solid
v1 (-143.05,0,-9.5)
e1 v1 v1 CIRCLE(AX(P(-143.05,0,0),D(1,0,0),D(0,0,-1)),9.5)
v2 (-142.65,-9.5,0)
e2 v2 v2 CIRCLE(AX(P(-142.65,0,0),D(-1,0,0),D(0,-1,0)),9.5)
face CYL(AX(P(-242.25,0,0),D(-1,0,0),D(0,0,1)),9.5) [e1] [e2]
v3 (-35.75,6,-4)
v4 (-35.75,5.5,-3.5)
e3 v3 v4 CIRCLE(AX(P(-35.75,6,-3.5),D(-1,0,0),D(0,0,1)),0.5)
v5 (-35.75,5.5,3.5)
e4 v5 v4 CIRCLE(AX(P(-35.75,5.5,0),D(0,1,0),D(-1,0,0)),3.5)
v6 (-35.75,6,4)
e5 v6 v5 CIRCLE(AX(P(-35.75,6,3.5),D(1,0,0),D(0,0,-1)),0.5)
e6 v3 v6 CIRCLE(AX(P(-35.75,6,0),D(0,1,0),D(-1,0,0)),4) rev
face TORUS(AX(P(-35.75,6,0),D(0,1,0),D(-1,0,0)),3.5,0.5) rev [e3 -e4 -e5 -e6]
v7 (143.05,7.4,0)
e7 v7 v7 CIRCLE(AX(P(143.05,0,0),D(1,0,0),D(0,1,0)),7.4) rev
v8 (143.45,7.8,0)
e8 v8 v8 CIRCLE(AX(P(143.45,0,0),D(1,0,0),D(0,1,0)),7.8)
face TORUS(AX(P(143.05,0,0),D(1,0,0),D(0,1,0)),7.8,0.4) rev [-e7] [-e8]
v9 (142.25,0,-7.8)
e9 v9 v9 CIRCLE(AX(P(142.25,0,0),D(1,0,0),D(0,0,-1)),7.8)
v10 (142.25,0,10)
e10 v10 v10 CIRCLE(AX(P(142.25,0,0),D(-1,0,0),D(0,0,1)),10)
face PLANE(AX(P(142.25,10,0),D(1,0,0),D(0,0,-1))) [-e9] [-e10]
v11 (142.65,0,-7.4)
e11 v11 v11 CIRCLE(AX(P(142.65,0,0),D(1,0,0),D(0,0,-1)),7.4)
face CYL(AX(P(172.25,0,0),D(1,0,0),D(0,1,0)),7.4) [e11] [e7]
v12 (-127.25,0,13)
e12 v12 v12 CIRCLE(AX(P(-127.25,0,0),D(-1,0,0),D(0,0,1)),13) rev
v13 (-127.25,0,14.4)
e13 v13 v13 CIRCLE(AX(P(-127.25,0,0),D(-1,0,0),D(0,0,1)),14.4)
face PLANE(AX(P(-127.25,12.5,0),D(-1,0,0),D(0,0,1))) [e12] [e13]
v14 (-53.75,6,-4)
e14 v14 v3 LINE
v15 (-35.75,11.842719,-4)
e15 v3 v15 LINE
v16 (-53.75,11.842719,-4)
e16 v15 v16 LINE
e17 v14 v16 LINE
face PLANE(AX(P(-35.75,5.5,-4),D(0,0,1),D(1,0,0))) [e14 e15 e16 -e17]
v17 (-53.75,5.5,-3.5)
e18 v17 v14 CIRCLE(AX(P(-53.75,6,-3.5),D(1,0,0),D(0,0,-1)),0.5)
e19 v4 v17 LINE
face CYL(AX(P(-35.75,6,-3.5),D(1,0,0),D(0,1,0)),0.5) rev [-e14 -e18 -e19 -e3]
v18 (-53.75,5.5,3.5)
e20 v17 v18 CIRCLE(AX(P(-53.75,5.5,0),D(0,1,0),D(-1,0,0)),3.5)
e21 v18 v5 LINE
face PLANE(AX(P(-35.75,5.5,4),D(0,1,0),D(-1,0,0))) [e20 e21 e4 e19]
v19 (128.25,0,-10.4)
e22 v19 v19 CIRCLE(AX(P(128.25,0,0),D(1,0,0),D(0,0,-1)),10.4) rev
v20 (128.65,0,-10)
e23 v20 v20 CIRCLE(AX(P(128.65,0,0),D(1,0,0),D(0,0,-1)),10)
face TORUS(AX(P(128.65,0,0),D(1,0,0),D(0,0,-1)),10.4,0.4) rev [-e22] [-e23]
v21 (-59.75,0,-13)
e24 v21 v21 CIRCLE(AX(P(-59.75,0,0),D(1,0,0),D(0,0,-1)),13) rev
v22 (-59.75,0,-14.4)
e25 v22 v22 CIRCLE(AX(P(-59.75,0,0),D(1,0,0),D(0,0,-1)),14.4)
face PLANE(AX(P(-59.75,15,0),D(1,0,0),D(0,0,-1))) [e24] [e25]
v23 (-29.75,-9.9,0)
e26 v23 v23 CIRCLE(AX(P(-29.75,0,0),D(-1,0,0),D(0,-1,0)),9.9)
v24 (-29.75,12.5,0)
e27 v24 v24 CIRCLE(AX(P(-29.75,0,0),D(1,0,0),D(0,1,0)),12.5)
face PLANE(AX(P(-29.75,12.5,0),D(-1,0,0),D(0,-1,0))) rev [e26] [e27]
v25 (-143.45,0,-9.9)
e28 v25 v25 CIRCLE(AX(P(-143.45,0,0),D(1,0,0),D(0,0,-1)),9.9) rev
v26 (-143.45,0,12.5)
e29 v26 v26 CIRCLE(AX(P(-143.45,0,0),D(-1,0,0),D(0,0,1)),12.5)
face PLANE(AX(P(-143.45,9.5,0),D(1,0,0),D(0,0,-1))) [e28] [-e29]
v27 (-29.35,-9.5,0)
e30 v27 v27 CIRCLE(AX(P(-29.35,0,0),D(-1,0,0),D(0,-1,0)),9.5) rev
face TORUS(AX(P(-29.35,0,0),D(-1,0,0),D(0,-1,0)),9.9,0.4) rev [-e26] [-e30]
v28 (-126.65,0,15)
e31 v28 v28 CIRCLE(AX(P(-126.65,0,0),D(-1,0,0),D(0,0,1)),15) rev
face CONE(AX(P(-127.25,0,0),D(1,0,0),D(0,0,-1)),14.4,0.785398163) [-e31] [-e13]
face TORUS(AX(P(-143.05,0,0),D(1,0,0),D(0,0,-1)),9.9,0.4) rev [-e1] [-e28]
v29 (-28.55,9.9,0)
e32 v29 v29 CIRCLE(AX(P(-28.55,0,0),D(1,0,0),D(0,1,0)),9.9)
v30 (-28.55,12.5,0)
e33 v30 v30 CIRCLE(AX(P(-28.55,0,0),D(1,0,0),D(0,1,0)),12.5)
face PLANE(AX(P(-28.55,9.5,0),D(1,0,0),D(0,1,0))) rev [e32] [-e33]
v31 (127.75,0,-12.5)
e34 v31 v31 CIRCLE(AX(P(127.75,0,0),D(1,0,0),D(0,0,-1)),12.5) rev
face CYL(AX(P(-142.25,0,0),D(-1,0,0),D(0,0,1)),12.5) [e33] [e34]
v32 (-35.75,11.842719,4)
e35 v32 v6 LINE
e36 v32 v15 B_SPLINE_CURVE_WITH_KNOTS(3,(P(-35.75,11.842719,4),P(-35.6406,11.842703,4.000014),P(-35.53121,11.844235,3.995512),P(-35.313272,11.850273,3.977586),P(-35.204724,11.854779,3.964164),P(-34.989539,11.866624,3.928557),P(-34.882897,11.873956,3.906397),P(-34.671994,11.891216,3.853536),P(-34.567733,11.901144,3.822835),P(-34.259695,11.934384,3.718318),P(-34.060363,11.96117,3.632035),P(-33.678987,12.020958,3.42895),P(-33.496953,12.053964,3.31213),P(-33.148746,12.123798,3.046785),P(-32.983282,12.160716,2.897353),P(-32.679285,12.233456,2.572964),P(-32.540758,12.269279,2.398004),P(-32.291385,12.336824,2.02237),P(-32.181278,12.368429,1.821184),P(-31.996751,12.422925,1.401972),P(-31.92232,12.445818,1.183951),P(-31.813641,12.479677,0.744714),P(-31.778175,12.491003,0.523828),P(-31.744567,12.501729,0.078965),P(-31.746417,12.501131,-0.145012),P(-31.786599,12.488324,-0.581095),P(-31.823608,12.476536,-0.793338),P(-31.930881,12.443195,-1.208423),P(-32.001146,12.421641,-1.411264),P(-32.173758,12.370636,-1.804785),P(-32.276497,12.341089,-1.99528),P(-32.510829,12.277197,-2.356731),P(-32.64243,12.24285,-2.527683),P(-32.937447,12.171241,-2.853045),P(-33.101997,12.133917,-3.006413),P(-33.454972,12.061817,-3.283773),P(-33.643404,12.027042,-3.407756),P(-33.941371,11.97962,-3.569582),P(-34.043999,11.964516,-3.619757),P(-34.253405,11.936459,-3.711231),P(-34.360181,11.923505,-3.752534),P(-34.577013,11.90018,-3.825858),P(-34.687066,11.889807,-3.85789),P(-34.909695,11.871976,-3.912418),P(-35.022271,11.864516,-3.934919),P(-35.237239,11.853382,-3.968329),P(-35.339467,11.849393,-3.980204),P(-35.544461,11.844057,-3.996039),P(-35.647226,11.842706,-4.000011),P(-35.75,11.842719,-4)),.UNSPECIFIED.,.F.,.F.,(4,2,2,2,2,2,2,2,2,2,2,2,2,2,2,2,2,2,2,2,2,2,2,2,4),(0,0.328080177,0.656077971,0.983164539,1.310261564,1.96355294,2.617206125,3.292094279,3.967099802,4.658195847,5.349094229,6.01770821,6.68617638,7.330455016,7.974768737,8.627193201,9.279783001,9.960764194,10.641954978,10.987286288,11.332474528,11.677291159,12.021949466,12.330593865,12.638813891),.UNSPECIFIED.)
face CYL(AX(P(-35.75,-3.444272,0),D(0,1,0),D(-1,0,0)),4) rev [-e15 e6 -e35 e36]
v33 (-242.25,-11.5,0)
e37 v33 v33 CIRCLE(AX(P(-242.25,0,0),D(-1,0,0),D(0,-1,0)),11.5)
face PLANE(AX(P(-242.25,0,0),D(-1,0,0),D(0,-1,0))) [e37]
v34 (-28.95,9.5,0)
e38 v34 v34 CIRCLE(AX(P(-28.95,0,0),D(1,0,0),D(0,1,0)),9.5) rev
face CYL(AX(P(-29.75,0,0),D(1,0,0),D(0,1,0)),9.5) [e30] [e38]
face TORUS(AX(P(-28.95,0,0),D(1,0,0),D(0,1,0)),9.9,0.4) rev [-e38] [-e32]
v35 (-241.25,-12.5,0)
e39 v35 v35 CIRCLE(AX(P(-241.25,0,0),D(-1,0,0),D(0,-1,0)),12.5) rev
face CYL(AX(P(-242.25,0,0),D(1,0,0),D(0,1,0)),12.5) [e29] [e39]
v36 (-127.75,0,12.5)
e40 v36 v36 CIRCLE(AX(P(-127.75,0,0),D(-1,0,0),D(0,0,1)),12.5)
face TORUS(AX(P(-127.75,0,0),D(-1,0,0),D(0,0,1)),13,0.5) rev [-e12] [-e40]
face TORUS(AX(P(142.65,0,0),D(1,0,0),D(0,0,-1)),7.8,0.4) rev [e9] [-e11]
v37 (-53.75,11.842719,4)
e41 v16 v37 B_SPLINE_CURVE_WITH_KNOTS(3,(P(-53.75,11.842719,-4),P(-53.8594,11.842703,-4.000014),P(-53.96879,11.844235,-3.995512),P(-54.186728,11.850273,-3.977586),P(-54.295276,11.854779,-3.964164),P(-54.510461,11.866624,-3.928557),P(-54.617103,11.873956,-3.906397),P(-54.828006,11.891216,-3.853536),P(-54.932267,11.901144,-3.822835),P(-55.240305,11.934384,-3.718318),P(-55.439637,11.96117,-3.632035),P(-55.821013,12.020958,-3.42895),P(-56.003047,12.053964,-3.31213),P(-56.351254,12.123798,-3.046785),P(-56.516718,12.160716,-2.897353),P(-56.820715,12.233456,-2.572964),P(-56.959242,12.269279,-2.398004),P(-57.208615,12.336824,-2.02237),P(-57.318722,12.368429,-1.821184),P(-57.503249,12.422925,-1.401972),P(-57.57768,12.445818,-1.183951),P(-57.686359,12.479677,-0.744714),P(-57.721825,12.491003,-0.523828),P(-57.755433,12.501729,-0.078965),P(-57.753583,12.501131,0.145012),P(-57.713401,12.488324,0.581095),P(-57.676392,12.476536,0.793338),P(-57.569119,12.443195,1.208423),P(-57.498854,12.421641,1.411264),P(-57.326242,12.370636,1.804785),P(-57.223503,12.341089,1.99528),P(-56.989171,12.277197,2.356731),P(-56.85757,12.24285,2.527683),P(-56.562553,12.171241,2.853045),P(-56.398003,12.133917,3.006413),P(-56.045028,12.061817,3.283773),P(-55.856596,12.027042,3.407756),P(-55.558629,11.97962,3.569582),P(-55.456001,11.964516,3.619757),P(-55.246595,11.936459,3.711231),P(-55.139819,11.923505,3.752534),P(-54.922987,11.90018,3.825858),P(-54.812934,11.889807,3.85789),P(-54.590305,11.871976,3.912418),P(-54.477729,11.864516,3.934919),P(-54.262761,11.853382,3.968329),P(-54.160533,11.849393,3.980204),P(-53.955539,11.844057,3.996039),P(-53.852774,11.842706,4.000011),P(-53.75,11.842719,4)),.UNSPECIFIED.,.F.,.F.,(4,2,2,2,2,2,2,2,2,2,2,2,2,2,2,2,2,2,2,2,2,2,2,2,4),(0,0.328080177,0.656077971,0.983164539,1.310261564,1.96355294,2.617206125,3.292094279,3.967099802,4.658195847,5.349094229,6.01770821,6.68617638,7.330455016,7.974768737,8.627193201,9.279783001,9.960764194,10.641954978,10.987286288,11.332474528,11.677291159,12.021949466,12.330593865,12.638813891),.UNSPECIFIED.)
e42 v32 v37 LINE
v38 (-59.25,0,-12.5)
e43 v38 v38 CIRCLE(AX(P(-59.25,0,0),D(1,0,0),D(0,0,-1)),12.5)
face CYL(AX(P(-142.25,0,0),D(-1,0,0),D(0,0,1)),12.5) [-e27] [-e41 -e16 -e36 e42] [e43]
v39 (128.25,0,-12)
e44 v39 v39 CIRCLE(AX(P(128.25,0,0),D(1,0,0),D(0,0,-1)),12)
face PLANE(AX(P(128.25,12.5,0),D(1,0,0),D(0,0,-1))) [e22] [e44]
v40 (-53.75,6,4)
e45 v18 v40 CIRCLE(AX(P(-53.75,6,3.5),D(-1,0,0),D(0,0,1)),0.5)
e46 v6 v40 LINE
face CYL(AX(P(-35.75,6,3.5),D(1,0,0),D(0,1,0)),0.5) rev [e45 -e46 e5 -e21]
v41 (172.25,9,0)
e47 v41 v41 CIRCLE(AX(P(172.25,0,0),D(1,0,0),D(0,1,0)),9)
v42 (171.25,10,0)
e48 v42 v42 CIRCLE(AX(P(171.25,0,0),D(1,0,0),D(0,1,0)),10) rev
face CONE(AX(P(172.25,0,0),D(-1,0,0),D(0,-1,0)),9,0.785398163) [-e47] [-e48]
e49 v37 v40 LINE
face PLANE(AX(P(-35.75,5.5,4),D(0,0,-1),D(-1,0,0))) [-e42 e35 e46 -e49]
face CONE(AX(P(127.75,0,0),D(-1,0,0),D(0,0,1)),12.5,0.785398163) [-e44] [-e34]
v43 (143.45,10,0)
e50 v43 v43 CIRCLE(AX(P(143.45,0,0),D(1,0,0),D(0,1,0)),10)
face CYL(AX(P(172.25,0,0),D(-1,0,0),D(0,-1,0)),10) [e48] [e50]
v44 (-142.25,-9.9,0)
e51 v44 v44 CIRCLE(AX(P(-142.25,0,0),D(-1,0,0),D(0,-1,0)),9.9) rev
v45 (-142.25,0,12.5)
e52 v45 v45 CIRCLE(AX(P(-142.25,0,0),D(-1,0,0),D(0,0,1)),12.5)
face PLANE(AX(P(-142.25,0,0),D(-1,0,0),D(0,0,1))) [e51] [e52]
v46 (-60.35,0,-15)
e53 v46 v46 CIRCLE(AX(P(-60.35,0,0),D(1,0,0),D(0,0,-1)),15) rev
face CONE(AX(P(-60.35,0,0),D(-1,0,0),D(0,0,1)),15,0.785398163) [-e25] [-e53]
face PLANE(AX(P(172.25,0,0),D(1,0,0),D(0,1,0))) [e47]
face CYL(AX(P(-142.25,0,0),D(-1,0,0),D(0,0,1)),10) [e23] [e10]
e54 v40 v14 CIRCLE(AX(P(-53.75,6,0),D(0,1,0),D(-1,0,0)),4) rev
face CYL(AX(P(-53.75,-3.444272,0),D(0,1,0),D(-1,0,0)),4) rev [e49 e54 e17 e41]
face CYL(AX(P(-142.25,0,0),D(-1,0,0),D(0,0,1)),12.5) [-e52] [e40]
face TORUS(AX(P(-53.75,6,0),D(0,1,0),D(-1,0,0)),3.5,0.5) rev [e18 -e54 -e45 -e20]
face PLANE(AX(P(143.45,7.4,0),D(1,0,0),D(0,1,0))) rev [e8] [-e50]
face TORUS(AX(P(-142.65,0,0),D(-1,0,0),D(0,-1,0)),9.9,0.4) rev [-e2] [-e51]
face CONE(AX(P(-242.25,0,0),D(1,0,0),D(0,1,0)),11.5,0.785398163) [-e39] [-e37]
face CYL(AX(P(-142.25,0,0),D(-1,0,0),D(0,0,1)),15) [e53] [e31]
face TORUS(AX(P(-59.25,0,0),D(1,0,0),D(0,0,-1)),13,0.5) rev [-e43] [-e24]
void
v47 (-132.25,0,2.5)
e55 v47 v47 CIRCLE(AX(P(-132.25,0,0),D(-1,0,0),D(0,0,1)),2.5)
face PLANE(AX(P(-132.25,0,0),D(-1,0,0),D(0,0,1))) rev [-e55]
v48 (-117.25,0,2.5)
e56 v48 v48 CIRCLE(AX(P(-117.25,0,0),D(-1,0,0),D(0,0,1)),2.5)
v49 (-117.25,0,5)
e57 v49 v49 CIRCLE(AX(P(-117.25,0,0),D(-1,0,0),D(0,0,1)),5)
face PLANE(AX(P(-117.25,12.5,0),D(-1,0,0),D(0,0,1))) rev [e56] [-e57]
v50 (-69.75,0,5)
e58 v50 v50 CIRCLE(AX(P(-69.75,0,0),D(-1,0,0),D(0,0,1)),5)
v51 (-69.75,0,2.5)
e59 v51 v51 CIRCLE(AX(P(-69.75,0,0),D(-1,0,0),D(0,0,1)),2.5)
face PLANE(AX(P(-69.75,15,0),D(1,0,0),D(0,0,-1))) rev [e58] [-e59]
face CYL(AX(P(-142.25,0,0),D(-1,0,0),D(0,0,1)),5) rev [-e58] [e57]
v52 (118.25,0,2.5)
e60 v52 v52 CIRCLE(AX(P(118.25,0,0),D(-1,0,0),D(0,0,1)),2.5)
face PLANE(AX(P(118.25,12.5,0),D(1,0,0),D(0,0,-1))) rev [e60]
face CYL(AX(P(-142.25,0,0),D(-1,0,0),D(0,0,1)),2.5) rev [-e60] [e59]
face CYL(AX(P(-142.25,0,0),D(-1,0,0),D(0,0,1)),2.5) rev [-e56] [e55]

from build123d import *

# Parameters (mm, degrees)
SKETCH3_R           = 10
BOSS_EXTRUDE1_DEPTH = 30
SKETCH4_R           = 12.5
BOSS_EXTRUDE2_DEPTH = 100
SKETCH5_W           = 1.2
SKETCH5_H           = 3
SKETCH6_W           = 1.2
SKETCH6_H           = 2.6
SKETCH7_W           = 1.2
SKETCH7_H           = 3
CUT_EXTRUDE1_START  = 18
CUT_EXTRUDE1_DEPTH  = 18
FILLET1_R           = 0.4
CHAMFER1_SIZE       = 0.5
FILLET2_R           = 0.5
CHAMFER2_SIZE       = 0.6
CHAMFER3_SIZE       = 0.6
FILLET3_R           = 0.5
CUT_EXTRUDE2_DEPTH  = 7
FILLET4_R           = 0.4
FILLET5_R           = 0.4
FILLET6_R           = 0.4
FILLET7_R           = 0.5
CHAMFER4_SIZE       = 1
CHAMFER5_SIZE       = 1


# Read off the part's stored shape, not the designer's step: Revolve-Thin1
with BuildPart() as part:
    # Revolve-Thin1 outline → Revolve-Thin1 (revolve)
    with BuildSketch(Plane.YX):
        Polygon((0, -132.25), (0, -142.25), (12.5, -142.25), (12.5, -127.25), (15, -127.25), (15, -59.75), (12.5, -59.75), (12.5, 128.25), (10, 128.25), (10, 142.25), (0, 142.25), (0, 118.25), (2.5, 118.25), (2.5, -69.75), (5, -69.75), (5, -117.25), (2.5, -117.25), (2.5, -132.25), align=None)
    revolve(axis=Axis((0, 0, 0), (1, 0, 0)))

    # Sketch7 → Cut-Revolve3 (revolve, cut)
    with BuildSketch(Plane.XY, mode=Mode.PRIVATE) as cut_revolve3_sk:
        with Locations((-29.15, 11)):
            Rectangle(SKETCH7_W, SKETCH7_H)
    revolve(cut_revolve3_sk.sketch.rotate(Axis((-29.75, 0, 0), (-1, 0, 0)), 270), axis=Axis((-29.75, 0, 0), (-1, 0, 0)), mode=Mode.SUBTRACT)

    # Sketch8 → Cut-Extrude1 (cut)
    with BuildSketch(Plane(origin=(-53.75, 0, 0), x_dir=(0, 0, -1), z_dir=(1, 0, 0)).offset(CUT_EXTRUDE1_START)):
        with BuildLine():
            Line((-4, 5.5), (4, 5.5))
            Line((4, 5.5), (4, 11.842719282))
            ThreePointArc((4, 11.842719282), (0, 12.5), (-4, 11.842719282))
            Line((-4, 11.842719282), (-4, 5.5))
        make_face()
    extrude(amount=-CUT_EXTRUDE1_DEPTH, mode=Mode.SUBTRACT)

    # Fillet1
    fillet1_edges = [part.edges().sort_by_distance(p)[0] for p in [
        (128.25, -10, 0),
    ]]
    fillet(fillet1_edges, radius=FILLET1_R)

    # Chamfer1
    chamfer1_edges = [part.edges().sort_by_distance(p)[0] for p in [
        (128.25, -12.5, 0),
    ]]
    chamfer(chamfer1_edges, length=CHAMFER1_SIZE)

    # Fillet2
    fillet2_edges = [part.edges().sort_by_distance(p)[0] for p in [
        (-59.75, -12.5, 0),
    ]]
    fillet(fillet2_edges, radius=FILLET2_R)

    # Chamfer2
    chamfer2_edges = [part.edges().sort_by_distance(p)[0] for p in [
        (-59.75, -15, 0),
    ]]
    chamfer(chamfer2_edges, length=CHAMFER2_SIZE)

    # Chamfer3
    chamfer3_edges = [part.edges().sort_by_distance(p)[0] for p in [
        (-127.25, -15, 0),
    ]]
    chamfer(chamfer3_edges, length=CHAMFER3_SIZE)

    # Fillet3
    fillet3_edges = [part.edges().sort_by_distance(p)[0] for p in [
        (-127.25, -12.5, 0),
    ]]
    fillet(fillet3_edges, radius=FILLET3_R)

    # Sketch9 → Cut-Extrude2 (cut)
    with BuildSketch(Plane(origin=(0, 12.5, 0), x_dir=(1, 0, 0), z_dir=(0, 1, 0))):
        with BuildLine():
            Line((-53.75, 4), (-53.75, -4))
            ThreePointArc((-53.75, -4), (-57.75, 0), (-53.75, 4))
        make_face()
        with BuildLine():
            Line((-35.75, 4), (-35.75, -4))
            ThreePointArc((-35.75, -4), (-31.75, 0), (-35.75, 4))
        make_face()
    extrude(amount=-CUT_EXTRUDE2_DEPTH, mode=Mode.SUBTRACT)

    # Fillet5
    fillet5_edges = [part.edges().sort_by_distance(p)[0] for p in [
        (-29.75, 0, -9.5),
        (-28.55, 0, -9.5),
    ]]
    fillet(fillet5_edges, radius=FILLET5_R)



with BuildPart() as body_2:
    # Sketch3 → Boss-Extrude1 (new body)
    with BuildSketch(Plane(origin=(142.25, 0, 0), x_dir=(0, 0, -1), z_dir=(1, 0, 0))):
        with Locations(Location((0, 0, 0), (0, 0, 90))):
            Circle(SKETCH3_R)
    extrude(amount=BOSS_EXTRUDE1_DEPTH)

    # Sketch6 → Cut-Revolve2 (revolve, cut)
    with BuildSketch(Plane.XY, mode=Mode.PRIVATE) as cut_revolve2_sk:
        with Locations((142.85, 8.7)):
            Rectangle(SKETCH6_W, SKETCH6_H)
    revolve(cut_revolve2_sk.sketch.rotate(Axis((172.25, 0, 0), (-1, 0, 0)), 270), axis=Axis((172.25, 0, 0), (-1, 0, 0)), mode=Mode.SUBTRACT)

    # Fillet6
    fillet6_edges = [body_2.edges().sort_by_distance(p)[0] for p in [
        (143.45, 0, -7.4),
    ]]
    fillet(fillet6_edges, radius=FILLET6_R)


with BuildPart() as body_3:
    # Sketch4 → Boss-Extrude2 (new body)
    with BuildSketch(Plane.ZY.offset(142.25)):
        with Locations(Location((0, 0, 0), (0, 0, 270))):
            Circle(SKETCH4_R)
    extrude(amount=BOSS_EXTRUDE2_DEPTH)

    # Sketch5 → Cut-Revolve1 (revolve, cut)
    with BuildSketch(Plane.XY, mode=Mode.PRIVATE) as cut_revolve1_sk:
        with Locations((-142.85, 11)):
            Rectangle(SKETCH5_W, SKETCH5_H)
    revolve(cut_revolve1_sk.sketch.rotate(Axis((-242.25, 0, 0), (1, 0, 0)), 90), axis=Axis((-242.25, 0, 0), (1, 0, 0)), mode=Mode.SUBTRACT)

    # Fillet4
    fillet4_edges = [body_3.edges().sort_by_distance(p)[0] for p in [
        (-143.45, 0, -9.5),
    ]]
    fillet(fillet4_edges, radius=FILLET4_R)

    # Chamfer4
    chamfer4_edges = [body_3.edges().sort_by_distance(p)[0] for p in [
        (-242.25, 12.5, 0),
    ]]
    chamfer(chamfer4_edges, length=CHAMFER4_SIZE)


with BuildPart() as part_1:
    add(part.part)

    add(body_2.part)  # Revolve2 merges body 2
    # Sketch10 → Revolve2 (revolve)
    with BuildSketch(Plane(origin=(0, 0, 0), x_dir=(1, 0, 0), z_dir=(0, 1, 0)), mode=Mode.PRIVATE) as revolve2_sk:
        with BuildLine():
            Line((142.25, 7.8), (142.25, 7.4))
            Line((142.25, 7.4), (142.65, 7.4))
            ThreePointArc((142.65, 7.4), (142.367157288, 7.517157288), (142.25, 7.8))
        make_face()
    revolve(revolve2_sk.sketch.rotate(Axis((172.25, 0, 0), (-1, 0, 0)), 270), axis=Axis((172.25, 0, 0), (-1, 0, 0)))

    # Fillet7
    fillet7_edges = [part_1.edges().sort_by_distance(p)[0] for p in [
        (-44.75, 5.5, 4),
        (-44.75, 5.5, -4),
        (-57.75, 5.5, 0),
        (-31.75, 5.5, 0),
    ]]
    fillet(fillet7_edges, radius=FILLET7_R)

    # Chamfer5
    chamfer5_edges = [part_1.edges().sort_by_distance(p)[0] for p in [
        (172.25, -10, 0),
    ]]
    chamfer(chamfer5_edges, length=CHAMFER5_SIZE)


    add(body_3.part)  # Revolve4 merges body 3
    # Sketch12 → Revolve4 (revolve)
    with BuildSketch(Plane.XY, mode=Mode.PRIVATE) as revolve4_sk:
        with BuildLine():
            Line((-142.25, 9.5), (-142.65, 9.5))
            ThreePointArc((-142.65, 9.5), (-142.367157288, 9.617157288), (-142.25, 9.9))
            Line((-142.25, 9.9), (-142.25, 9.5))
        make_face()
    revolve(revolve4_sk.sketch.rotate(Axis((-241.25, 0, 0), (1, 0, 0)), 90), axis=Axis((-241.25, 0, 0), (1, 0, 0)))


solid = part_1.part
